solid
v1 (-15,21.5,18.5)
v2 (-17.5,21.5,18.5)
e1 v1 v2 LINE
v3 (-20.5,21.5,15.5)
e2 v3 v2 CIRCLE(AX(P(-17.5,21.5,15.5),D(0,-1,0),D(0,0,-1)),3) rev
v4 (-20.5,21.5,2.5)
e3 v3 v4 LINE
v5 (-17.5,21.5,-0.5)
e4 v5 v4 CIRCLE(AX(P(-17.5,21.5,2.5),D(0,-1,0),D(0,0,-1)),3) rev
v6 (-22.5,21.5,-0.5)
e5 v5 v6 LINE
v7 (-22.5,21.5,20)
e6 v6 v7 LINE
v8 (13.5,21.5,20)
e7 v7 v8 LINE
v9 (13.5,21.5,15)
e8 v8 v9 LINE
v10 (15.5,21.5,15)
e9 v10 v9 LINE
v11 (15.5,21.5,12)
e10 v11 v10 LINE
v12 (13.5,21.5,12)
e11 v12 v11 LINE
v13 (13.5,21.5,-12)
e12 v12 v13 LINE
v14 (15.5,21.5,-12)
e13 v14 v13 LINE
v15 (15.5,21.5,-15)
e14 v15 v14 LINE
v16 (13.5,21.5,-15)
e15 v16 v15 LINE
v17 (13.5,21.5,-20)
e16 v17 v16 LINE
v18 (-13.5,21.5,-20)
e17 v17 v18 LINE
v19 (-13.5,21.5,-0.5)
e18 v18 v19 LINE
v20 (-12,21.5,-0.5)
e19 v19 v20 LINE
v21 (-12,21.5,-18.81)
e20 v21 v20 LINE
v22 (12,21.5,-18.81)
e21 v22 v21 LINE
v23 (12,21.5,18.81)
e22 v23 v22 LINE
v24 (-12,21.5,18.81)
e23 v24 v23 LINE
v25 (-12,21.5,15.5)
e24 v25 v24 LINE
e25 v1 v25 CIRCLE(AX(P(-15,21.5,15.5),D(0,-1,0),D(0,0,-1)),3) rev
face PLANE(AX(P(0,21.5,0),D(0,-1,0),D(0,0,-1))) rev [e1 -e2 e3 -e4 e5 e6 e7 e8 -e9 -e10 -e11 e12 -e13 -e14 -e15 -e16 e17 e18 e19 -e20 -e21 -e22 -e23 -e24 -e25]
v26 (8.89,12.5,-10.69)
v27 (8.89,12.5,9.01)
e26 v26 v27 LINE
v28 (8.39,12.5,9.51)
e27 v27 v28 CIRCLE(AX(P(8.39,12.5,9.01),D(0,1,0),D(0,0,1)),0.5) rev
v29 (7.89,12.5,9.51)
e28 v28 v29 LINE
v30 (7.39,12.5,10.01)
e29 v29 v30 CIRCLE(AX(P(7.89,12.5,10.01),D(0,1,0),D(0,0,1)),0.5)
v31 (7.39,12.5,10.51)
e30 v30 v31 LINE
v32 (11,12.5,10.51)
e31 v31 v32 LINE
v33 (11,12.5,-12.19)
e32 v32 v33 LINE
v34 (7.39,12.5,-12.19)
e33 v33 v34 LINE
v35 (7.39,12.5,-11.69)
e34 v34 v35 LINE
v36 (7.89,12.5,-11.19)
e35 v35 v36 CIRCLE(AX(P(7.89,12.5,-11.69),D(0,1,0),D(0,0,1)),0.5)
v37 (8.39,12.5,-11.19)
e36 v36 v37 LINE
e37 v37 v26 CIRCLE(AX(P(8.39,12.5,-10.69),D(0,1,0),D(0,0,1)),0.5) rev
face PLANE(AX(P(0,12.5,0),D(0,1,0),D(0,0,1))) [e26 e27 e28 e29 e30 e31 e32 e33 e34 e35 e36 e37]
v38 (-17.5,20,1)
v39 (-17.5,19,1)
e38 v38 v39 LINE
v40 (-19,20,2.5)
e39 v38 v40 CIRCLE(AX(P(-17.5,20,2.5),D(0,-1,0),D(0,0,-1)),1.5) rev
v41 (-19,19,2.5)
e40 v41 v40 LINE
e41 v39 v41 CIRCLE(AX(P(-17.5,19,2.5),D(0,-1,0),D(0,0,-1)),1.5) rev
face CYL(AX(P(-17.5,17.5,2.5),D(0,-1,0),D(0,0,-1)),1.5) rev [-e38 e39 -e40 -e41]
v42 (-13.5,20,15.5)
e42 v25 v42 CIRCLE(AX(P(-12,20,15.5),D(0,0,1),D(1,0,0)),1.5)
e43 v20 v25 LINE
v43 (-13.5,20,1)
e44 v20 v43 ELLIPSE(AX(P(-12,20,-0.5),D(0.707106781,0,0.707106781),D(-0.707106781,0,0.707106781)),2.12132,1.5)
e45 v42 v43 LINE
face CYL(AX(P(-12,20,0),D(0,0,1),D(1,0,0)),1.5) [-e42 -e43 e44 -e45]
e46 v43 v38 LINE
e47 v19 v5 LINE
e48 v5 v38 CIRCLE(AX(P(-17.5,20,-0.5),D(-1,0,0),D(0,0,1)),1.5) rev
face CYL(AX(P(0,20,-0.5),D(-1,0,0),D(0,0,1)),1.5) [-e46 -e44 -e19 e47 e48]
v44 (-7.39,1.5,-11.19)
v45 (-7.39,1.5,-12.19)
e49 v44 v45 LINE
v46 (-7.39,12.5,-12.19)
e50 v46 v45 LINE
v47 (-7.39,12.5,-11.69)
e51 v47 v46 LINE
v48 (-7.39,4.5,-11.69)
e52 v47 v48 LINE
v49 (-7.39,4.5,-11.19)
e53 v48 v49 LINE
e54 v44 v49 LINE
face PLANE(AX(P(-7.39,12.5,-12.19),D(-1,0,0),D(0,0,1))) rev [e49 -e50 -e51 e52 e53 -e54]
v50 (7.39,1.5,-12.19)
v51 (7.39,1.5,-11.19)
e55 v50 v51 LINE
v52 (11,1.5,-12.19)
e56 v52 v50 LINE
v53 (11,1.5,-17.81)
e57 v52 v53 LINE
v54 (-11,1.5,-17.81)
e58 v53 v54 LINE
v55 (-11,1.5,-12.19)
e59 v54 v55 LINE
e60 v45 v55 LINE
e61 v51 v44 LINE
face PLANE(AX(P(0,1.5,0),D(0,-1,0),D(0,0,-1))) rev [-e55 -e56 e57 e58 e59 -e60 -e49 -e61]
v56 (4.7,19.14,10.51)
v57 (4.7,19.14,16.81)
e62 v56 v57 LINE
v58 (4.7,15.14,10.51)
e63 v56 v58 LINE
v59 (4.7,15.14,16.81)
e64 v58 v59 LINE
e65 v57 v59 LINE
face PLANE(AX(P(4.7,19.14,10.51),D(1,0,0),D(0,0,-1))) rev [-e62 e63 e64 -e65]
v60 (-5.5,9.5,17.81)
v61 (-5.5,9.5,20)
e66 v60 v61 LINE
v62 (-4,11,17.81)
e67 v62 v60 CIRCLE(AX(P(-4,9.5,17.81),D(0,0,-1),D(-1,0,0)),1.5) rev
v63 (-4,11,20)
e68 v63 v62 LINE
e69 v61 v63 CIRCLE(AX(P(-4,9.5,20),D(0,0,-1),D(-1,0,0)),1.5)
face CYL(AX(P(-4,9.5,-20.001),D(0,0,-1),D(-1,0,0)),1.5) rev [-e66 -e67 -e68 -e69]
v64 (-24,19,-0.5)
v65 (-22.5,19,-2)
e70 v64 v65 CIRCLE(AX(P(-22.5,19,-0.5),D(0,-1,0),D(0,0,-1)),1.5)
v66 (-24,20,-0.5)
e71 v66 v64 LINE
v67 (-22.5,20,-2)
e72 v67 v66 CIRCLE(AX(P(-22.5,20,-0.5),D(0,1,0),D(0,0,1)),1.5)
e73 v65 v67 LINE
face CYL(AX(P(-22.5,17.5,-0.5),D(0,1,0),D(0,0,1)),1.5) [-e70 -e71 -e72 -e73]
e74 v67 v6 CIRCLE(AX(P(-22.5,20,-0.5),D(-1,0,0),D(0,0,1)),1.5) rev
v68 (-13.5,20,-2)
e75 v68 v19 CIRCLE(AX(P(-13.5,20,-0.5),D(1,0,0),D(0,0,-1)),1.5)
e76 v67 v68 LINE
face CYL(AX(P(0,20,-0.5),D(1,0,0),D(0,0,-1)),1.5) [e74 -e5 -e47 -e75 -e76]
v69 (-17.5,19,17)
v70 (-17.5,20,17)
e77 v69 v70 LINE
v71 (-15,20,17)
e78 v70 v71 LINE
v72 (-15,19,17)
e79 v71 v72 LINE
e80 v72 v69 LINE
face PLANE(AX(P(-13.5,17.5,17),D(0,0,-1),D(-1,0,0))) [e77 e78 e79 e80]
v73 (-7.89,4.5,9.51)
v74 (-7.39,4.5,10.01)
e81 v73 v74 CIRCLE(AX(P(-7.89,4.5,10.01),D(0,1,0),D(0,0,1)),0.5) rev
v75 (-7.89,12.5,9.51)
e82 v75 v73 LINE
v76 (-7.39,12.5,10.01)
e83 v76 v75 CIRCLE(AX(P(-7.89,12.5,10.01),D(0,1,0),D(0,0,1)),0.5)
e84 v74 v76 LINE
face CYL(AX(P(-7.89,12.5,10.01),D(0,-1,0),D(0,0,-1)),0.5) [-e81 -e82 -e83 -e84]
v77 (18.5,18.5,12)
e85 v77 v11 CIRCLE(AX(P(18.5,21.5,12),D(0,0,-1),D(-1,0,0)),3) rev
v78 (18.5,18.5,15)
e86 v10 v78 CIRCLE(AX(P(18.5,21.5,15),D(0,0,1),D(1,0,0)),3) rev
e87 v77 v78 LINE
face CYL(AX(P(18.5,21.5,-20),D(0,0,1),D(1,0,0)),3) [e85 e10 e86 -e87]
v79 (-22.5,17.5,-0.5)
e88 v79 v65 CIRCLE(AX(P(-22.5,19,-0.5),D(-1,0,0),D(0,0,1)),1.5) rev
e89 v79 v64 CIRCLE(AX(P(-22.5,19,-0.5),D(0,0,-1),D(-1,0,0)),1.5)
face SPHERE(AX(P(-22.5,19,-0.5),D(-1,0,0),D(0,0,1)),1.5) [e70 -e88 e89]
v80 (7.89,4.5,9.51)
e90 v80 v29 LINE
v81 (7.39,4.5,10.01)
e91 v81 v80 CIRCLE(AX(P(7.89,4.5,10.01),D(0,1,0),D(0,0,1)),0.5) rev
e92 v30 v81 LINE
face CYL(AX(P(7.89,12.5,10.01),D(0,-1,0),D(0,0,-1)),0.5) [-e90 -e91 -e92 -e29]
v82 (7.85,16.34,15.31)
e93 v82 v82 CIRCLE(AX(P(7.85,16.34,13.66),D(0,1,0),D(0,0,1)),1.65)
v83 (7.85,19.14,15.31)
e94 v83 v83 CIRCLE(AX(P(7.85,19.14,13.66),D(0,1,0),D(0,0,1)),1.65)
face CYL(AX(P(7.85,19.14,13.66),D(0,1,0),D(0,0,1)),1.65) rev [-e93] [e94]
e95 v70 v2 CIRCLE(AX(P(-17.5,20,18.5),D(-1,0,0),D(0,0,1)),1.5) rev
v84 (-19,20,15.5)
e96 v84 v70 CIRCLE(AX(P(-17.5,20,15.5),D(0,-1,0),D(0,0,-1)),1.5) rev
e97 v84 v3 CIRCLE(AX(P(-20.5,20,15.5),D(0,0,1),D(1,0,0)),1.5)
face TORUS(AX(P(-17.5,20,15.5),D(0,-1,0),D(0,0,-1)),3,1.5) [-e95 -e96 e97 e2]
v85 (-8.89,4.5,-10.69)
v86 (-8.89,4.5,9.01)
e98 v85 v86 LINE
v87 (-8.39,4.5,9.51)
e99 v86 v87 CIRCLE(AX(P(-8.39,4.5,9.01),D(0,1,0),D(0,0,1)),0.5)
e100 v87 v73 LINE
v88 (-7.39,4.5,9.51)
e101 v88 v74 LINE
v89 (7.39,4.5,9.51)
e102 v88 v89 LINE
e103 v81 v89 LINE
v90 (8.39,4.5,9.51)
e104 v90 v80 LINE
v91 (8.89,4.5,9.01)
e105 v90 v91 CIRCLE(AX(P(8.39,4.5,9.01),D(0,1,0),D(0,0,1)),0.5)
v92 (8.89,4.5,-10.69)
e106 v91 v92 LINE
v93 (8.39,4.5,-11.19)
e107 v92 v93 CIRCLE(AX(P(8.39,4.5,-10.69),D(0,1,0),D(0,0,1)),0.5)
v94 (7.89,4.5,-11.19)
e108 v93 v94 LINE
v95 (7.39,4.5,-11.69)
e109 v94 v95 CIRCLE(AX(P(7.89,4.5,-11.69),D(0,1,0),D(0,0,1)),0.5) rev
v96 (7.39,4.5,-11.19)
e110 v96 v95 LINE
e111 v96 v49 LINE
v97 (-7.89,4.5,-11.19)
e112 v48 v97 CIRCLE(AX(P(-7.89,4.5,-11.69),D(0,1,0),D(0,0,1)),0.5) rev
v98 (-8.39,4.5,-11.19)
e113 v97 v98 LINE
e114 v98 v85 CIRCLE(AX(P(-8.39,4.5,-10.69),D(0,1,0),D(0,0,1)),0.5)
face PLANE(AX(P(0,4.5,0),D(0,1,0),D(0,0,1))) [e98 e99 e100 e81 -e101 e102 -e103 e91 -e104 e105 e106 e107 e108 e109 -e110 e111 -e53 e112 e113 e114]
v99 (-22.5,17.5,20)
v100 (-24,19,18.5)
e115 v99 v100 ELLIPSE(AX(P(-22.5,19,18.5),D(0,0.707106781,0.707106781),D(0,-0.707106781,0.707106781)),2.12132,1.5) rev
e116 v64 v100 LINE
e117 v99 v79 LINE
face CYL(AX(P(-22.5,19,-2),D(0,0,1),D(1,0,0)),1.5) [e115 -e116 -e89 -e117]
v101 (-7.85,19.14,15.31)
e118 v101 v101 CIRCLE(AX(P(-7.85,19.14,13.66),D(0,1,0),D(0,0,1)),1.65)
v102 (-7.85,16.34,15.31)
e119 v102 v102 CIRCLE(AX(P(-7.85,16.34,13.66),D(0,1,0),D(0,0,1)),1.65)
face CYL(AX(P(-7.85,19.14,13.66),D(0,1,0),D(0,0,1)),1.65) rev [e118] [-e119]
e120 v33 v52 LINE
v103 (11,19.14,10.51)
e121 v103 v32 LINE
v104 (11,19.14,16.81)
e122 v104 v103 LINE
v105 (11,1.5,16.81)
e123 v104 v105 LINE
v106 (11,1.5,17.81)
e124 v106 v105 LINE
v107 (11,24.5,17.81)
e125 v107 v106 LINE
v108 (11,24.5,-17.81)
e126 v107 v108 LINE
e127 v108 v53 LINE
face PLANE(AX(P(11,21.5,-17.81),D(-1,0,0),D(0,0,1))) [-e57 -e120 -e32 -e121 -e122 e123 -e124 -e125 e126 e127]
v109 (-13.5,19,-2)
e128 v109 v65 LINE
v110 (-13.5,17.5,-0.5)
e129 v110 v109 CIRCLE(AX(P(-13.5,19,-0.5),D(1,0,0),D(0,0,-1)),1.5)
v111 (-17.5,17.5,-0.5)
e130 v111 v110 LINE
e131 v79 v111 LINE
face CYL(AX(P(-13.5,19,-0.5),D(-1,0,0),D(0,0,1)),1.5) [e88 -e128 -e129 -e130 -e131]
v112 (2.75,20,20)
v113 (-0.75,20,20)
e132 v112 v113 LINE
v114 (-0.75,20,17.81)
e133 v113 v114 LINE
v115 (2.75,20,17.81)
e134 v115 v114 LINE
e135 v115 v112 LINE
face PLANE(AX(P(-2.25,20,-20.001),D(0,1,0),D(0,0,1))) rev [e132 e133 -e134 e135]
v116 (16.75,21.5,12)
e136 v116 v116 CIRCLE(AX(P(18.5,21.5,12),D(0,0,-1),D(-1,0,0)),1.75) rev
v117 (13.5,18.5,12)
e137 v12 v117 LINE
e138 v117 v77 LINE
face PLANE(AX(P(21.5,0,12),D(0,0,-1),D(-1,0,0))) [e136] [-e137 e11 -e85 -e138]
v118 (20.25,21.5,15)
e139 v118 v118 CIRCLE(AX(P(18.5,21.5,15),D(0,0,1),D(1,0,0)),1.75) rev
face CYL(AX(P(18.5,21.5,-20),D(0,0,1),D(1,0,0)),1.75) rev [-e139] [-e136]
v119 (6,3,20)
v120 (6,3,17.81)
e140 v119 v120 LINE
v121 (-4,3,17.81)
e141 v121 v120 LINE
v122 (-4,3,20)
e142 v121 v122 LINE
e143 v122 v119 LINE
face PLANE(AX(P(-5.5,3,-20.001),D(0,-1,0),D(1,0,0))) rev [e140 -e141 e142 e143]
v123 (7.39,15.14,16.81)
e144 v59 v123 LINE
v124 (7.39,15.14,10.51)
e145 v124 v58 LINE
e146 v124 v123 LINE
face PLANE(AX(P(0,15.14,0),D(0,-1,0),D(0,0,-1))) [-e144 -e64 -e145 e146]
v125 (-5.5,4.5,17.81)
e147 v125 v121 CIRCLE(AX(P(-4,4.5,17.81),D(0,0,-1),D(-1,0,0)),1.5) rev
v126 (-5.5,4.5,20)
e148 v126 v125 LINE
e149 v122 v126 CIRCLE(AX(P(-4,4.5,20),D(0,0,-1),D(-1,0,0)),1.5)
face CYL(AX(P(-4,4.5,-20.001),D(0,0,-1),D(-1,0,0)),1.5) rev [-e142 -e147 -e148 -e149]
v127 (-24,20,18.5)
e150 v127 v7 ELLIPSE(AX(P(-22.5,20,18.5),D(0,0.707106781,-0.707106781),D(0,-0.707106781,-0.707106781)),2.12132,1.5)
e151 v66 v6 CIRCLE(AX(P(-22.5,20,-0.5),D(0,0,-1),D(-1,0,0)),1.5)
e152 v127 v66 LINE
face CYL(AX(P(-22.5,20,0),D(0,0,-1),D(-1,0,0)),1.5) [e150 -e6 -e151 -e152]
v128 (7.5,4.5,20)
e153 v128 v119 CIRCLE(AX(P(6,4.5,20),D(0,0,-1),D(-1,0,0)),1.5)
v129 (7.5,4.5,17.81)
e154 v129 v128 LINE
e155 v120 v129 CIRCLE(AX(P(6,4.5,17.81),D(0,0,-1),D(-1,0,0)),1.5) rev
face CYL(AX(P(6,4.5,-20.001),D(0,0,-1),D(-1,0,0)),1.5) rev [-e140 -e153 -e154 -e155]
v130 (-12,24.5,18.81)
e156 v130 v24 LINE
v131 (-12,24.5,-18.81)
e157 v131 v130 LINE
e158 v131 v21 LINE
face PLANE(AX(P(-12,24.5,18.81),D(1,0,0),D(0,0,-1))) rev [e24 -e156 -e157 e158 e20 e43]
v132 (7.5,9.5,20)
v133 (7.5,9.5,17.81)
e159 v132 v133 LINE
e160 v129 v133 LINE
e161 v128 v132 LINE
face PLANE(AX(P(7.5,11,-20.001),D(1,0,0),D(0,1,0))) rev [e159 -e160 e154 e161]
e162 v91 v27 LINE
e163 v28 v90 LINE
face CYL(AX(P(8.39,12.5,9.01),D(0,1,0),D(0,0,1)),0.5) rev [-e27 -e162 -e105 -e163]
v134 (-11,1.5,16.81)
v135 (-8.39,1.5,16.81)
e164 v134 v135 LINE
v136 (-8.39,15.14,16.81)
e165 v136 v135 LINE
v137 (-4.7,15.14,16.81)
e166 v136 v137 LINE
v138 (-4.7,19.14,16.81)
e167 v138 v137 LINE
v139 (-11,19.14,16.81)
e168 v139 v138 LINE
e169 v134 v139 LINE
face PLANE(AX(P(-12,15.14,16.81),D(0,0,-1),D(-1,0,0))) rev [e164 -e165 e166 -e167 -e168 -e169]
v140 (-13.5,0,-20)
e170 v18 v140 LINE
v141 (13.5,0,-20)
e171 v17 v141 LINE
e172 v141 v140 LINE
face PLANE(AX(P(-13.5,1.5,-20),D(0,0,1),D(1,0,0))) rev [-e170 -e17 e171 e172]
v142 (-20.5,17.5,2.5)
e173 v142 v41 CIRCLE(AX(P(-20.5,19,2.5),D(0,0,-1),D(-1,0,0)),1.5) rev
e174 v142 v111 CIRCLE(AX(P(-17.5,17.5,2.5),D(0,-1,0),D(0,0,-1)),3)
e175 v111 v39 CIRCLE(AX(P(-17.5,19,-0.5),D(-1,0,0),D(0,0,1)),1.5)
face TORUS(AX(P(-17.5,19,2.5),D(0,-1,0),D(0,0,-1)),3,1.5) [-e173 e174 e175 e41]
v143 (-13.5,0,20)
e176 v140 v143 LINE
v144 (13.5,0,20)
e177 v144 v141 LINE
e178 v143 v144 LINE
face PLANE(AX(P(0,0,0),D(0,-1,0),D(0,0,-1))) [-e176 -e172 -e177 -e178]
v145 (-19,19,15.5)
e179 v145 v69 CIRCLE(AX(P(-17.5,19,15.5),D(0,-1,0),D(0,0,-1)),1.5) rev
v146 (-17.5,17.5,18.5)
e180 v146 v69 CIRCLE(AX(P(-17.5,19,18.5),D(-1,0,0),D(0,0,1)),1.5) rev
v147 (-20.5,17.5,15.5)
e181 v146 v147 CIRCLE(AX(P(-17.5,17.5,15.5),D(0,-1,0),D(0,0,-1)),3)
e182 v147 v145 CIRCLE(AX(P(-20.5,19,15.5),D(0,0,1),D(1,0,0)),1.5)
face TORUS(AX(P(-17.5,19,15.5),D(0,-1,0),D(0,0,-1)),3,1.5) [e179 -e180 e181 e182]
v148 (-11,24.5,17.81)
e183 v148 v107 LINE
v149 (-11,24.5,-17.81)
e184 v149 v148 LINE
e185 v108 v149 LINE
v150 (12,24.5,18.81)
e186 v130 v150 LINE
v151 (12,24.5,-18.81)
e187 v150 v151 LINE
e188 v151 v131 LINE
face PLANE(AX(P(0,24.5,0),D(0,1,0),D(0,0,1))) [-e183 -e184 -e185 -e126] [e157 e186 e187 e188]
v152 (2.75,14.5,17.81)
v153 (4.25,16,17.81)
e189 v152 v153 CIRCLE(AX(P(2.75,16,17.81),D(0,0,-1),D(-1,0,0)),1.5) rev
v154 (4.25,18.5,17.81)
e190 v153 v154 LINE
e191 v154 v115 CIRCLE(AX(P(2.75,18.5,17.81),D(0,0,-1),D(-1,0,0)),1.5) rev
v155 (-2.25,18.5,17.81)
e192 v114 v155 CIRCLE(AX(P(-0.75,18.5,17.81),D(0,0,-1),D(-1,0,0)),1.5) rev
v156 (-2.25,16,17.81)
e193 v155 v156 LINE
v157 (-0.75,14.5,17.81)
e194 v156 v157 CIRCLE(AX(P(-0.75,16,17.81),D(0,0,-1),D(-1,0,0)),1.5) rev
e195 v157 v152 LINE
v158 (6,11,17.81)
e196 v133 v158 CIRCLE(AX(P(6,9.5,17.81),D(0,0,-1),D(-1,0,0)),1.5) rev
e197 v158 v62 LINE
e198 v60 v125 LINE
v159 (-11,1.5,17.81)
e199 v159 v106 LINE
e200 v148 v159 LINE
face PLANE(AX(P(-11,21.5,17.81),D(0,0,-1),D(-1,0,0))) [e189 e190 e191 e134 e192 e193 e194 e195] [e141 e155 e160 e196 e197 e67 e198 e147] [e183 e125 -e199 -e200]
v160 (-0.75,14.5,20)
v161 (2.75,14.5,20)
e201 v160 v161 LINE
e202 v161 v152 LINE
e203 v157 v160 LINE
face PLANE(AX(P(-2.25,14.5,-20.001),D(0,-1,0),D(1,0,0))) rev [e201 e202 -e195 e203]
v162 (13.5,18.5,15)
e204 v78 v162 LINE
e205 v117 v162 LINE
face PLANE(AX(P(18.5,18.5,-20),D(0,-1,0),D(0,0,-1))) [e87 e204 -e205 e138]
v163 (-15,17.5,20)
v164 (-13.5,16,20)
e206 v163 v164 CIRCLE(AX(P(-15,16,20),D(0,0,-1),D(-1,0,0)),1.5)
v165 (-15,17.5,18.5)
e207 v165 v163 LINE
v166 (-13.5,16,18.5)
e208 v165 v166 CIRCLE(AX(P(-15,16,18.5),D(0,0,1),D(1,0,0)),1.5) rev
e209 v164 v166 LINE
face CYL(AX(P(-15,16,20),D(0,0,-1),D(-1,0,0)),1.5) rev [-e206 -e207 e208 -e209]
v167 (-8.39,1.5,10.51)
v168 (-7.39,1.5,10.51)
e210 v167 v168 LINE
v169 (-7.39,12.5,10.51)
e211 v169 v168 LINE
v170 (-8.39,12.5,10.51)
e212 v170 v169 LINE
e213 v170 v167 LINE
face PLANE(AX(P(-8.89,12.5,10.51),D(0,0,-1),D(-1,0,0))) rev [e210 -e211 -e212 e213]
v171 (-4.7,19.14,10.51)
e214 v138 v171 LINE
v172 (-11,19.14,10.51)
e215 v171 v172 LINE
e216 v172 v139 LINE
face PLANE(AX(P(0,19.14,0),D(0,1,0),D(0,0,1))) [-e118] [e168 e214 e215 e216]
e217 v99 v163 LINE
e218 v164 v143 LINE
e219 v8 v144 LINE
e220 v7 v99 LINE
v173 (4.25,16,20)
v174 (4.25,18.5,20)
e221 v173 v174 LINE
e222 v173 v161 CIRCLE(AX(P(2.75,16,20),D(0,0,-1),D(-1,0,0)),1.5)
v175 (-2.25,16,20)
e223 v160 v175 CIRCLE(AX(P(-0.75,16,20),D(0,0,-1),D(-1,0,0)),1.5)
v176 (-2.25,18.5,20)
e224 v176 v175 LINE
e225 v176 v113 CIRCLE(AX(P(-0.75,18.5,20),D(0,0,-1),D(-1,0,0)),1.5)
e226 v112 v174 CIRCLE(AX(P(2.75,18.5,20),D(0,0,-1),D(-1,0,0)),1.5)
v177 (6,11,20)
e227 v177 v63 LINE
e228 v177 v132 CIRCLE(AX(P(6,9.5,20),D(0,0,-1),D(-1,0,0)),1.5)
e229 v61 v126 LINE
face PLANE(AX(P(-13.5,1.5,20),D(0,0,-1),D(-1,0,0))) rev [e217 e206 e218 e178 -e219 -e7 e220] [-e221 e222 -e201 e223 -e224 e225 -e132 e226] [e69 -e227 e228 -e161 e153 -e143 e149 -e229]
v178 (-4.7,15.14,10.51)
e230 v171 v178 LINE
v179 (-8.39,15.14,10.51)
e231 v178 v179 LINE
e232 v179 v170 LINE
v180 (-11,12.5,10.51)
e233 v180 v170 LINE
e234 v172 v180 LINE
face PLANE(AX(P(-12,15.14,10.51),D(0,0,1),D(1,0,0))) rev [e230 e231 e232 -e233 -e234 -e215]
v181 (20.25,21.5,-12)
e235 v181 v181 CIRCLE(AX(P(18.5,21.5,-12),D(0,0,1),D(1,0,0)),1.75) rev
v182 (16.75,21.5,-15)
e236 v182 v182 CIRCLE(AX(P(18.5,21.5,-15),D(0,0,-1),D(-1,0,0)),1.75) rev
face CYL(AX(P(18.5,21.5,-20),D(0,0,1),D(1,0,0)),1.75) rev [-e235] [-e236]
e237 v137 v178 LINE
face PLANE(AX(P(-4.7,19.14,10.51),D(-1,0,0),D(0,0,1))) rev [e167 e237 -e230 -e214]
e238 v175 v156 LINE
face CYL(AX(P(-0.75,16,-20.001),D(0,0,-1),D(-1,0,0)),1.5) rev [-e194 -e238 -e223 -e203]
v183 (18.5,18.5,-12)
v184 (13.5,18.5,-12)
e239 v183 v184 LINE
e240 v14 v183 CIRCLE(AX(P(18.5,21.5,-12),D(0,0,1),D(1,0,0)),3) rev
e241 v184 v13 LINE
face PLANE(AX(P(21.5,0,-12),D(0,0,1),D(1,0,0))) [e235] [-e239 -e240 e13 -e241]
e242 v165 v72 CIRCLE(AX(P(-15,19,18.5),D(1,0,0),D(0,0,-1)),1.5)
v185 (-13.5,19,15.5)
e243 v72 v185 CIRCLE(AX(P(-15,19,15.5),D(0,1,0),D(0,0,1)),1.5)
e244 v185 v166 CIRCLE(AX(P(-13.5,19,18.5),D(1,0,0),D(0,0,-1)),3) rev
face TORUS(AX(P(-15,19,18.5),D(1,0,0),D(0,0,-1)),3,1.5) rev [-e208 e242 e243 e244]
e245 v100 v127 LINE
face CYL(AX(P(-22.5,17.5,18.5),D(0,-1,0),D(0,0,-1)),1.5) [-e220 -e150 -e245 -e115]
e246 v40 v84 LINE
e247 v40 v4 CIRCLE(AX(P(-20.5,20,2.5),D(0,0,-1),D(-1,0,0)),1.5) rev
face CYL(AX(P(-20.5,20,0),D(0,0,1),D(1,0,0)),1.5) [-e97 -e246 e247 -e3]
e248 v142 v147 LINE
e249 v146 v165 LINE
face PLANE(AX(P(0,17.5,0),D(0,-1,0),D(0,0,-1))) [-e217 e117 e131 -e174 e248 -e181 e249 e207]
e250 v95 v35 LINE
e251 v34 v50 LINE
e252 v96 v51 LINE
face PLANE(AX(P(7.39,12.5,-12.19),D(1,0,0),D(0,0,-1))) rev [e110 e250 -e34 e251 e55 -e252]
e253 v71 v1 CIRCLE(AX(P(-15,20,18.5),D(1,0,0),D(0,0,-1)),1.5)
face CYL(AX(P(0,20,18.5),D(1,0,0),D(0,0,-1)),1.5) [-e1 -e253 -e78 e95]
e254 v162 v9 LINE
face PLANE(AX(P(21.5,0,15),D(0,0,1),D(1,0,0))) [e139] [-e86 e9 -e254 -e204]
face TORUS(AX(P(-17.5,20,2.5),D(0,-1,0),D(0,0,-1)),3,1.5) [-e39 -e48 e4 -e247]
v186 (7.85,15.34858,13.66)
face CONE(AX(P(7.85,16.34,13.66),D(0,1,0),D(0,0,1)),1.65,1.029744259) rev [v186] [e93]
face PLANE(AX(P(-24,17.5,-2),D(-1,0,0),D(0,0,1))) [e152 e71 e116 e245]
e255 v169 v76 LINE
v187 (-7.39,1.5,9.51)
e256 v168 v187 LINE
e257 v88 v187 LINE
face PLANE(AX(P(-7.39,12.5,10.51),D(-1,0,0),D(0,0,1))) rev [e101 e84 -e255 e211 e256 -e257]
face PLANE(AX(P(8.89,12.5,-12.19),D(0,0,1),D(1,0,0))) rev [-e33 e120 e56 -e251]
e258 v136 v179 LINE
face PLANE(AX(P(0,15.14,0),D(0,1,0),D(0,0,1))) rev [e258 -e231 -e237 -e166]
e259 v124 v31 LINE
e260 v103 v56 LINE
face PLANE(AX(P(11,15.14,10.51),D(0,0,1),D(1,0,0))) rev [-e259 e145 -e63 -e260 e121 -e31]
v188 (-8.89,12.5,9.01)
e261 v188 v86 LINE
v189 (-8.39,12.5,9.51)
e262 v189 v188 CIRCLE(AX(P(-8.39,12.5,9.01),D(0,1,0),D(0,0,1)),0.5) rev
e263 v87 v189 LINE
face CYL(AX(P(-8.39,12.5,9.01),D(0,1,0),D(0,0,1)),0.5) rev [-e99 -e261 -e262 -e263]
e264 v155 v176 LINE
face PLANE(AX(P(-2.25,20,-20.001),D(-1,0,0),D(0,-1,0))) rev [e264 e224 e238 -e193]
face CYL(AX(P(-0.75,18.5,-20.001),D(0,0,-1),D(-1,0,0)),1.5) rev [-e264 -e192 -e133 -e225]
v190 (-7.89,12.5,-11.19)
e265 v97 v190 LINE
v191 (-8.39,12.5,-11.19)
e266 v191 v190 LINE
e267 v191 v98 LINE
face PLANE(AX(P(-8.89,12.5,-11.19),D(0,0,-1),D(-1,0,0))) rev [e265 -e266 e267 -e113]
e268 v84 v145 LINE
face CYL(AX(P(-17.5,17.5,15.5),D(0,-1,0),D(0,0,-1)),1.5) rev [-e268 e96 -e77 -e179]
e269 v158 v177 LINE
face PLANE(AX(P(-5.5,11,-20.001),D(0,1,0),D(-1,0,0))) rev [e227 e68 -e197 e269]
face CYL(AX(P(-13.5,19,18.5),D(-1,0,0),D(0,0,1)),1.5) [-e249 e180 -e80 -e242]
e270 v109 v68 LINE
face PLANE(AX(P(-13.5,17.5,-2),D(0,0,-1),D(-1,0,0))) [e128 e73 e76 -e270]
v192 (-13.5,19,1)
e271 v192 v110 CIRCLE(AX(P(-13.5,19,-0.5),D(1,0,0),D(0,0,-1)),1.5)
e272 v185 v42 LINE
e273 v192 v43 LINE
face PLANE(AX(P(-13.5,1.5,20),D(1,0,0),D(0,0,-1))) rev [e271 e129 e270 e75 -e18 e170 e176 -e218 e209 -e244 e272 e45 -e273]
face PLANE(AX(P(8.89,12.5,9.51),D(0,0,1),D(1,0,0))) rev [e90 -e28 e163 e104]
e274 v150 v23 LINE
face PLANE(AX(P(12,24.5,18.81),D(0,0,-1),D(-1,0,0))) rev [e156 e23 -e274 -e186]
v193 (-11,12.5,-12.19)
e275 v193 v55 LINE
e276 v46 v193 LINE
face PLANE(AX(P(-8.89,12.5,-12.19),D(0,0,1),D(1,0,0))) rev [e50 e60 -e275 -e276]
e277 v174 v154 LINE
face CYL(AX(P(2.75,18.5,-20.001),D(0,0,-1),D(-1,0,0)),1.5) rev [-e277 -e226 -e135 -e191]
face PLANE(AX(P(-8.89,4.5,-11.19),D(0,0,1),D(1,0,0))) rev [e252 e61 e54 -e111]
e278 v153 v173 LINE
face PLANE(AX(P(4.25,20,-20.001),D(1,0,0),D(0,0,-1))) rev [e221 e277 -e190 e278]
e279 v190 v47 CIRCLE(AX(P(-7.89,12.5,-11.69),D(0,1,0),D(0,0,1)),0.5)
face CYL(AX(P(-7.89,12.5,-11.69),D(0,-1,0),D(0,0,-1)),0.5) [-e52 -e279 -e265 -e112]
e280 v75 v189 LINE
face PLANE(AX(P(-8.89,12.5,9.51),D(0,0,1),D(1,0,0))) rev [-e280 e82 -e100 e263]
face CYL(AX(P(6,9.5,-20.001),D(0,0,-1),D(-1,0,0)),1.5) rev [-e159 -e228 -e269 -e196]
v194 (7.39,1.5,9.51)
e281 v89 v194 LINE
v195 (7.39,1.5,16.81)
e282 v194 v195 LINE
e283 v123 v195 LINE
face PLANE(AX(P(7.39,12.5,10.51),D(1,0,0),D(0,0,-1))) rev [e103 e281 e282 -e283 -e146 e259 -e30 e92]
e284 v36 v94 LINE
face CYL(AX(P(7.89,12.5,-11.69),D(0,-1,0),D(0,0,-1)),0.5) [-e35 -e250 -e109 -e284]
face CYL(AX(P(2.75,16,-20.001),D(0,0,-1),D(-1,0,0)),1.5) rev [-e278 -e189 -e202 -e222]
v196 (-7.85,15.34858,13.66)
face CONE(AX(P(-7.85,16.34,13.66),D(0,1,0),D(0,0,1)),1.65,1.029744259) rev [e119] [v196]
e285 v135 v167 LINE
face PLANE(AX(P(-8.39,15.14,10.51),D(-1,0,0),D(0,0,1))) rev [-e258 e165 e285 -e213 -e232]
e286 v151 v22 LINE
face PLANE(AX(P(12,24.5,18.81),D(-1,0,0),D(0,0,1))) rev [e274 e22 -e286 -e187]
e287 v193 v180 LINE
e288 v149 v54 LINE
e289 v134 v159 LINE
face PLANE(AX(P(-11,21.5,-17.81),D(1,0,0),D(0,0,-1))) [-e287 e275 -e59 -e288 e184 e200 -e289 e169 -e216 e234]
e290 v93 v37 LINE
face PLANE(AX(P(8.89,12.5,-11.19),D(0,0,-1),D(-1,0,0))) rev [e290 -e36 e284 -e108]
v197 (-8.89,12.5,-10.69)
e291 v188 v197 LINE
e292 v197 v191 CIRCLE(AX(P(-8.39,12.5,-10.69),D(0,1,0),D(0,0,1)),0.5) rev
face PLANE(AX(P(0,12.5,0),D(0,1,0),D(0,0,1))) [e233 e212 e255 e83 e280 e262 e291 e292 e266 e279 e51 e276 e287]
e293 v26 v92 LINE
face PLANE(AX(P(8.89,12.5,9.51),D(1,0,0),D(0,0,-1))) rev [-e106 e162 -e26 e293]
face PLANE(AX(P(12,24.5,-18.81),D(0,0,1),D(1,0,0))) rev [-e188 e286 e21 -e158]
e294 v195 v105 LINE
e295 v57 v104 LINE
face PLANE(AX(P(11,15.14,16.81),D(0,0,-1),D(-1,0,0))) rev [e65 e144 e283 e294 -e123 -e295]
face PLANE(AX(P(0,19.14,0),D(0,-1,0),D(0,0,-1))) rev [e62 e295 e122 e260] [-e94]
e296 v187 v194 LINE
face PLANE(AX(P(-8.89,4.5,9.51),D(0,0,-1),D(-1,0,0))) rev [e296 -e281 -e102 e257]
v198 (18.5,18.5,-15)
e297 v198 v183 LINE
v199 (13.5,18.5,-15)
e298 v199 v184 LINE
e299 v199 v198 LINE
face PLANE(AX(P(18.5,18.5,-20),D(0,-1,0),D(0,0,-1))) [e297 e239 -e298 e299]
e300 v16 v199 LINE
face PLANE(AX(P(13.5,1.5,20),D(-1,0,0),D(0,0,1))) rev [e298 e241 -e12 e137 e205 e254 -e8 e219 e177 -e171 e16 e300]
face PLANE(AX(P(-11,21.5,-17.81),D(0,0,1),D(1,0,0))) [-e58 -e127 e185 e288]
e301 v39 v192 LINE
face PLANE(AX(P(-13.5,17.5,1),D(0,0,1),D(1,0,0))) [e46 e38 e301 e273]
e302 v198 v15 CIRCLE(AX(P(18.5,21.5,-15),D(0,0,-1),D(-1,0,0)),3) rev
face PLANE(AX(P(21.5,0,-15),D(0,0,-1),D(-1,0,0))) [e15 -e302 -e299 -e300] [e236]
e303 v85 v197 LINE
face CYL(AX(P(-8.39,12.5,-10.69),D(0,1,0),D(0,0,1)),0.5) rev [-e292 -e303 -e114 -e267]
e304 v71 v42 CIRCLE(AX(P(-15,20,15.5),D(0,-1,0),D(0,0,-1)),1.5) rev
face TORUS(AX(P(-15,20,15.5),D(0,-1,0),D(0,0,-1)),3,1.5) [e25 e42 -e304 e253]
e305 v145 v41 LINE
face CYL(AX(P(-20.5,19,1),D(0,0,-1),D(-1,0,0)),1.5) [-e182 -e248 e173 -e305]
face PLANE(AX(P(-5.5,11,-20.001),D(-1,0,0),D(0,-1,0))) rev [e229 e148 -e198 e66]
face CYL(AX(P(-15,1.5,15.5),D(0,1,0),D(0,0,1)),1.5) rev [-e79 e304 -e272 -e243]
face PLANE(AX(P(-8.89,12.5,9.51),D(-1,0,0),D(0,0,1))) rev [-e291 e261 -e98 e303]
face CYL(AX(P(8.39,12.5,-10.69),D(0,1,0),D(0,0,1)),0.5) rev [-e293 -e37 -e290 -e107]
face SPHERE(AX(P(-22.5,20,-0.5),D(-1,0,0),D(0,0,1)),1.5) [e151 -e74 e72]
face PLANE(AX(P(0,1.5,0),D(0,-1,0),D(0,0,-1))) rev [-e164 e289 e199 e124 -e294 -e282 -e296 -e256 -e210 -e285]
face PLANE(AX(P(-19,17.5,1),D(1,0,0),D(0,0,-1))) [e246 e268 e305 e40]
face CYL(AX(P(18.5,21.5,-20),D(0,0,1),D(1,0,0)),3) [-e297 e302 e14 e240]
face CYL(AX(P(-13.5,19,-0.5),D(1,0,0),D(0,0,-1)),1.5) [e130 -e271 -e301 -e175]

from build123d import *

# Parameters (mm, degrees)
SKETCH2_W                 = 27
SKETCH2_H                 = 40
BOSS_EXTRUDE1_DEPTH       = 1.5
SKETCH3_W                 = 27
SKETCH3_H                 = 40
SKETCH3_W_2               = 22
SKETCH3_H_2               = 35.62
BOSS_EXTRUDE2_DEPTH       = 20
SKETCH4_R                 = 1.75
BOSS_EXTRUDE3_DEPTH       = 40
BOSS_EXTRUDE4_DEPTH       = 11
SKETCH8_W                 = 17.78
SKETCH8_H                 = 20.7
BOSS_EXTRUDE5_DEPTH       = 3
FILLET1_R                 = 0.5
SKETCH9_W                 = 3.61
SKETCH9_H                 = 6.3
BOSS_EXTRUDE6_DEPTH       = 13.64
SKETCH10_W                = 6.3
SKETCH10_H                = 6.3
BOSS_EXTRUDE7_DEPTH       = 4
F_3_0MM_DOWEL_HOLE2_D     = 3.3
F_3_0MM_DOWEL_HOLE2_DEPTH = 2.8
F_3_0MM_DOWEL_HOLE2_TIP   = 0.991420021
CUT_EXTRUDE1_REACH        = 53.599
SKETCH13_W                = 13
SKETCH13_H                = 8
FILLET2_R                 = 1.5
CUT_EXTRUDE2_REACH        = 53.599
SKETCH14_W                = 6.5
SKETCH14_H                = 5.5
FILLET3_R                 = 1.5
SKETCH15_W                = 24
SKETCH15_H                = 37.62
SKETCH15_W_2              = 22
SKETCH15_H_2              = 35.62
BOSS_EXTRUDE8_DEPTH       = 3
BOSS_EXTRUDE9_DEPTH       = 4
FILLET4_R                 = 1.5
SKETCH17_W                = 5
SKETCH17_H                = 29.710811322
SKETCH17_H_2              = 26.502201667
SKETCH17_W_2              = 24
SKETCH17_H_3              = 26.060216056
CUT_EXTRUDE3_DEPTH        = 50.056090346


with BuildPart() as part:
    # Sketch2 → Boss-Extrude1 (new body)
    with BuildSketch(Plane(origin=(0, 0, 0), x_dir=(1, 0, 0), z_dir=(0, 1, 0))):
        Rectangle(SKETCH2_W, SKETCH2_H)
    extrude(amount=BOSS_EXTRUDE1_DEPTH)

    # Sketch3 → Boss-Extrude2 (add)
    with BuildSketch(Plane(origin=(0, 1.5, 0), x_dir=(1, 0, 0), z_dir=(0, 1, 0))):
        Rectangle(SKETCH3_W, SKETCH3_H)
        Rectangle(SKETCH3_W_2, SKETCH3_H_2, mode=Mode.SUBTRACT)
    extrude(amount=BOSS_EXTRUDE2_DEPTH)

    # Sketch4 → Boss-Extrude3 (add, through all)
    with BuildSketch(Plane.XY.offset(20)):
        with BuildLine():
            Line((15.5, 21.5), (13.5, 21.5))
            Line((13.5, 21.5), (13.5, 18.5))
            Line((13.5, 18.5), (18.5, 18.5))
            ThreePointArc((18.5, 18.5), (20.621320344, 23.621320344), (15.5, 21.5))
        make_face()
        with Locations((18.5, 21.5)):
            Circle(SKETCH4_R, mode=Mode.SUBTRACT)
    extrude(amount=-BOSS_EXTRUDE3_DEPTH)

    # Sketch6 → Boss-Extrude4 (add)
    with BuildSketch(Plane(origin=(0, 1.5, 0), x_dir=(1, 0, 0), z_dir=(0, 1, 0))):
        Polygon((8.89, -10.51), (7.39, -10.51), (7.39, -9.51), (8.89, -9.51), (8.89, 11.19), (7.39, 11.19), (7.39, 12.19), (8.89, 12.19), (11, 12.19), (11, -10.51), align=None)
        Polygon((-8.89, -10.51), (-11, -10.51), (-11, 12.19), (-8.89, 12.19), (-7.39, 12.19), (-7.39, 11.19), (-8.89, 11.19), (-8.89, -9.51), (-7.39, -9.51), (-7.39, -10.51), align=None)
    extrude(amount=BOSS_EXTRUDE4_DEPTH)

    # Sketch8 → Boss-Extrude5 (add)
    with BuildSketch(Plane(origin=(0, 1.5, 0), x_dir=(1, 0, 0), z_dir=(0, 1, 0))):
        with Locations((0, 0.84)):
            Rectangle(SKETCH8_W, SKETCH8_H)
    extrude(amount=BOSS_EXTRUDE5_DEPTH)

    # Fillet1
    fillet1_edges = [part.edges().sort_by_distance(p)[0] for p in [
        (7.39, 8.5, 9.51),
        (7.39, 8.5, -11.19),
        (8.89, 8.5, -11.19),
        (8.89, 8.5, 9.51),
        (-7.39, 8.5, 9.51),
        (-8.89, 8.5, 9.51),
        (-8.89, 8.5, -11.19),
        (-7.39, 8.5, -11.19),
    ]]
    fillet(fillet1_edges, radius=FILLET1_R)

    # Sketch9 → Boss-Extrude6 (add)
    with BuildSketch(Plane(origin=(0, 1.5, 0), x_dir=(1, 0, 0), z_dir=(0, 1, 0))):
        with Locations((-10.195, -13.66)):
            Rectangle(SKETCH9_W, SKETCH9_H)
        with Locations((9.195, -13.66)):
            Rectangle(SKETCH9_W, SKETCH9_H)
    extrude(amount=BOSS_EXTRUDE6_DEPTH)

    # Sketch10 → Boss-Extrude7 (add)
    with BuildSketch(Plane(origin=(0, 15.14, 0), x_dir=(1, 0, 0), z_dir=(0, 1, 0))):
        with Locations((-7.85, -13.66)):
            Rectangle(SKETCH10_W, SKETCH10_H)
        with Locations((7.85, -13.66)):
            Rectangle(SKETCH10_W, SKETCH10_H)
    extrude(amount=BOSS_EXTRUDE7_DEPTH)

    # Ø3.0mm Dowel Hole2
    with Locations(Plane(origin=(0, 19.14, 0), x_dir=(1, 0, 0), z_dir=(0, 1, 0))):
        with Locations((7.85, -13.66), (-7.85, -13.66)):
            Hole(F_3_0MM_DOWEL_HOLE2_D / 2, depth=F_3_0MM_DOWEL_HOLE2_DEPTH)
            with Locations((0, 0, -(F_3_0MM_DOWEL_HOLE2_DEPTH + F_3_0MM_DOWEL_HOLE2_TIP / 2))):  # 118° drill point
                Cone(0, F_3_0MM_DOWEL_HOLE2_D / 2, F_3_0MM_DOWEL_HOLE2_TIP, mode=Mode.SUBTRACT)

    # Sketch13 → Cut-Extrude1 (cut, up to next)
    with BuildSketch(Plane.XY.offset(20), mode=Mode.PRIVATE) as cut_extrude1_sk1:
        with Locations((1, 7)):
            Rectangle(SKETCH13_W, SKETCH13_H)
    cut_extrude1_tool1 = extrude(cut_extrude1_sk1.sketch, amount=-CUT_EXTRUDE1_REACH, mode=Mode.PRIVATE) & part.part
    add(cut_extrude1_tool1.solids().sort_by_distance((1, 7, 20))[0], mode=Mode.SUBTRACT)

    # Fillet2
    fillet2_edges = [part.edges().sort_by_distance(p)[0] for p in [
        (7.5, 3, 18.905),
        (7.5, 11, 18.905),
        (-5.5, 11, 18.905),
        (-5.5, 3, 18.905),
    ]]
    fillet(fillet2_edges, radius=FILLET2_R)

    # Sketch14 → Cut-Extrude2 (cut, up to next)
    with BuildSketch(Plane.XY.offset(20), mode=Mode.PRIVATE) as cut_extrude2_sk1:
        with Locations((1, 17.25)):
            Rectangle(SKETCH14_W, SKETCH14_H)
    cut_extrude2_tool1 = extrude(cut_extrude2_sk1.sketch, amount=-CUT_EXTRUDE2_REACH, mode=Mode.PRIVATE) & part.part
    add(cut_extrude2_tool1.solids().sort_by_distance((1, 17.25, 20))[0], mode=Mode.SUBTRACT)

    # Fillet3
    fillet3_edges = [part.edges().sort_by_distance(p)[0] for p in [
        (4.25, 14.5, 18.905),
        (4.25, 20, 18.905),
        (-2.25, 20, 18.905),
        (-2.25, 14.5, 18.905),
    ]]
    fillet(fillet3_edges, radius=FILLET3_R)

    # Sketch15 → Boss-Extrude8 (add)
    with BuildSketch(Plane(origin=(0, 21.5, 0), x_dir=(1, 0, 0), z_dir=(0, 1, 0))):
        Rectangle(SKETCH15_W, SKETCH15_H)
        Rectangle(SKETCH15_W_2, SKETCH15_H_2, mode=Mode.SUBTRACT)
    extrude(amount=BOSS_EXTRUDE8_DEPTH)

    # Sketch16 → Boss-Extrude9 (add)
    with BuildSketch(Plane(origin=(0, 21.5, 0), x_dir=(1, 0, 0), z_dir=(0, 1, 0))):
        Polygon((-13.5, -17), (-13.5, -20), (-24, -20), (-24, 2), (-13.5, 2), (-13.5, -1), (-19, -1), (-19, -17), align=None)
    extrude(amount=-BOSS_EXTRUDE9_DEPTH)

    # Fillet4
    fillet4_edges = [part.edges().sort_by_distance(p)[0] for p in [
        (-13.5, 17.5, 18.5),
        (-13.5, 21.5, 9),
        (-16.25, 17.5, 1),
        (-16.25, 17.5, 17),
        (-13.5, 19.5, 17),
        (-19, 17.5, 9),
        (-19, 19.5, 1),
        (-19, 19.5, 17),
        (-16.25, 21.5, 17),
        (-19, 21.5, 9),
        (-16.25, 21.5, 1),
        (-18.75, 17.5, -2),
        (-18.75, 21.5, -2),
        (-24, 19.5, 20),
        (-24, 21.5, 9),
        (-24, 17.5, 9),
        (-24, 19.5, -2),
    ]]
    fillet(fillet4_edges, radius=FILLET4_R - 0.0001)  # a hair under: the kernel refuses the full size

    # Sketch17 → Cut-Extrude3 (cut, through all)
    with BuildSketch(Plane(origin=(13.5, 0, 0), x_dir=(0, 0, -1), z_dir=(1, 0, 0))):
        with Locations((-17.5, 14.855405661)):
            Rectangle(SKETCH17_W, SKETCH17_H)
        with Locations((17.5, 13.251100834)):
            Rectangle(SKETCH17_W, SKETCH17_H_2)
        with Locations((0, 13.030108028)):
            Rectangle(SKETCH17_W_2, SKETCH17_H_3)
    extrude(amount=CUT_EXTRUDE3_DEPTH, mode=Mode.SUBTRACT)


solid = part.part
